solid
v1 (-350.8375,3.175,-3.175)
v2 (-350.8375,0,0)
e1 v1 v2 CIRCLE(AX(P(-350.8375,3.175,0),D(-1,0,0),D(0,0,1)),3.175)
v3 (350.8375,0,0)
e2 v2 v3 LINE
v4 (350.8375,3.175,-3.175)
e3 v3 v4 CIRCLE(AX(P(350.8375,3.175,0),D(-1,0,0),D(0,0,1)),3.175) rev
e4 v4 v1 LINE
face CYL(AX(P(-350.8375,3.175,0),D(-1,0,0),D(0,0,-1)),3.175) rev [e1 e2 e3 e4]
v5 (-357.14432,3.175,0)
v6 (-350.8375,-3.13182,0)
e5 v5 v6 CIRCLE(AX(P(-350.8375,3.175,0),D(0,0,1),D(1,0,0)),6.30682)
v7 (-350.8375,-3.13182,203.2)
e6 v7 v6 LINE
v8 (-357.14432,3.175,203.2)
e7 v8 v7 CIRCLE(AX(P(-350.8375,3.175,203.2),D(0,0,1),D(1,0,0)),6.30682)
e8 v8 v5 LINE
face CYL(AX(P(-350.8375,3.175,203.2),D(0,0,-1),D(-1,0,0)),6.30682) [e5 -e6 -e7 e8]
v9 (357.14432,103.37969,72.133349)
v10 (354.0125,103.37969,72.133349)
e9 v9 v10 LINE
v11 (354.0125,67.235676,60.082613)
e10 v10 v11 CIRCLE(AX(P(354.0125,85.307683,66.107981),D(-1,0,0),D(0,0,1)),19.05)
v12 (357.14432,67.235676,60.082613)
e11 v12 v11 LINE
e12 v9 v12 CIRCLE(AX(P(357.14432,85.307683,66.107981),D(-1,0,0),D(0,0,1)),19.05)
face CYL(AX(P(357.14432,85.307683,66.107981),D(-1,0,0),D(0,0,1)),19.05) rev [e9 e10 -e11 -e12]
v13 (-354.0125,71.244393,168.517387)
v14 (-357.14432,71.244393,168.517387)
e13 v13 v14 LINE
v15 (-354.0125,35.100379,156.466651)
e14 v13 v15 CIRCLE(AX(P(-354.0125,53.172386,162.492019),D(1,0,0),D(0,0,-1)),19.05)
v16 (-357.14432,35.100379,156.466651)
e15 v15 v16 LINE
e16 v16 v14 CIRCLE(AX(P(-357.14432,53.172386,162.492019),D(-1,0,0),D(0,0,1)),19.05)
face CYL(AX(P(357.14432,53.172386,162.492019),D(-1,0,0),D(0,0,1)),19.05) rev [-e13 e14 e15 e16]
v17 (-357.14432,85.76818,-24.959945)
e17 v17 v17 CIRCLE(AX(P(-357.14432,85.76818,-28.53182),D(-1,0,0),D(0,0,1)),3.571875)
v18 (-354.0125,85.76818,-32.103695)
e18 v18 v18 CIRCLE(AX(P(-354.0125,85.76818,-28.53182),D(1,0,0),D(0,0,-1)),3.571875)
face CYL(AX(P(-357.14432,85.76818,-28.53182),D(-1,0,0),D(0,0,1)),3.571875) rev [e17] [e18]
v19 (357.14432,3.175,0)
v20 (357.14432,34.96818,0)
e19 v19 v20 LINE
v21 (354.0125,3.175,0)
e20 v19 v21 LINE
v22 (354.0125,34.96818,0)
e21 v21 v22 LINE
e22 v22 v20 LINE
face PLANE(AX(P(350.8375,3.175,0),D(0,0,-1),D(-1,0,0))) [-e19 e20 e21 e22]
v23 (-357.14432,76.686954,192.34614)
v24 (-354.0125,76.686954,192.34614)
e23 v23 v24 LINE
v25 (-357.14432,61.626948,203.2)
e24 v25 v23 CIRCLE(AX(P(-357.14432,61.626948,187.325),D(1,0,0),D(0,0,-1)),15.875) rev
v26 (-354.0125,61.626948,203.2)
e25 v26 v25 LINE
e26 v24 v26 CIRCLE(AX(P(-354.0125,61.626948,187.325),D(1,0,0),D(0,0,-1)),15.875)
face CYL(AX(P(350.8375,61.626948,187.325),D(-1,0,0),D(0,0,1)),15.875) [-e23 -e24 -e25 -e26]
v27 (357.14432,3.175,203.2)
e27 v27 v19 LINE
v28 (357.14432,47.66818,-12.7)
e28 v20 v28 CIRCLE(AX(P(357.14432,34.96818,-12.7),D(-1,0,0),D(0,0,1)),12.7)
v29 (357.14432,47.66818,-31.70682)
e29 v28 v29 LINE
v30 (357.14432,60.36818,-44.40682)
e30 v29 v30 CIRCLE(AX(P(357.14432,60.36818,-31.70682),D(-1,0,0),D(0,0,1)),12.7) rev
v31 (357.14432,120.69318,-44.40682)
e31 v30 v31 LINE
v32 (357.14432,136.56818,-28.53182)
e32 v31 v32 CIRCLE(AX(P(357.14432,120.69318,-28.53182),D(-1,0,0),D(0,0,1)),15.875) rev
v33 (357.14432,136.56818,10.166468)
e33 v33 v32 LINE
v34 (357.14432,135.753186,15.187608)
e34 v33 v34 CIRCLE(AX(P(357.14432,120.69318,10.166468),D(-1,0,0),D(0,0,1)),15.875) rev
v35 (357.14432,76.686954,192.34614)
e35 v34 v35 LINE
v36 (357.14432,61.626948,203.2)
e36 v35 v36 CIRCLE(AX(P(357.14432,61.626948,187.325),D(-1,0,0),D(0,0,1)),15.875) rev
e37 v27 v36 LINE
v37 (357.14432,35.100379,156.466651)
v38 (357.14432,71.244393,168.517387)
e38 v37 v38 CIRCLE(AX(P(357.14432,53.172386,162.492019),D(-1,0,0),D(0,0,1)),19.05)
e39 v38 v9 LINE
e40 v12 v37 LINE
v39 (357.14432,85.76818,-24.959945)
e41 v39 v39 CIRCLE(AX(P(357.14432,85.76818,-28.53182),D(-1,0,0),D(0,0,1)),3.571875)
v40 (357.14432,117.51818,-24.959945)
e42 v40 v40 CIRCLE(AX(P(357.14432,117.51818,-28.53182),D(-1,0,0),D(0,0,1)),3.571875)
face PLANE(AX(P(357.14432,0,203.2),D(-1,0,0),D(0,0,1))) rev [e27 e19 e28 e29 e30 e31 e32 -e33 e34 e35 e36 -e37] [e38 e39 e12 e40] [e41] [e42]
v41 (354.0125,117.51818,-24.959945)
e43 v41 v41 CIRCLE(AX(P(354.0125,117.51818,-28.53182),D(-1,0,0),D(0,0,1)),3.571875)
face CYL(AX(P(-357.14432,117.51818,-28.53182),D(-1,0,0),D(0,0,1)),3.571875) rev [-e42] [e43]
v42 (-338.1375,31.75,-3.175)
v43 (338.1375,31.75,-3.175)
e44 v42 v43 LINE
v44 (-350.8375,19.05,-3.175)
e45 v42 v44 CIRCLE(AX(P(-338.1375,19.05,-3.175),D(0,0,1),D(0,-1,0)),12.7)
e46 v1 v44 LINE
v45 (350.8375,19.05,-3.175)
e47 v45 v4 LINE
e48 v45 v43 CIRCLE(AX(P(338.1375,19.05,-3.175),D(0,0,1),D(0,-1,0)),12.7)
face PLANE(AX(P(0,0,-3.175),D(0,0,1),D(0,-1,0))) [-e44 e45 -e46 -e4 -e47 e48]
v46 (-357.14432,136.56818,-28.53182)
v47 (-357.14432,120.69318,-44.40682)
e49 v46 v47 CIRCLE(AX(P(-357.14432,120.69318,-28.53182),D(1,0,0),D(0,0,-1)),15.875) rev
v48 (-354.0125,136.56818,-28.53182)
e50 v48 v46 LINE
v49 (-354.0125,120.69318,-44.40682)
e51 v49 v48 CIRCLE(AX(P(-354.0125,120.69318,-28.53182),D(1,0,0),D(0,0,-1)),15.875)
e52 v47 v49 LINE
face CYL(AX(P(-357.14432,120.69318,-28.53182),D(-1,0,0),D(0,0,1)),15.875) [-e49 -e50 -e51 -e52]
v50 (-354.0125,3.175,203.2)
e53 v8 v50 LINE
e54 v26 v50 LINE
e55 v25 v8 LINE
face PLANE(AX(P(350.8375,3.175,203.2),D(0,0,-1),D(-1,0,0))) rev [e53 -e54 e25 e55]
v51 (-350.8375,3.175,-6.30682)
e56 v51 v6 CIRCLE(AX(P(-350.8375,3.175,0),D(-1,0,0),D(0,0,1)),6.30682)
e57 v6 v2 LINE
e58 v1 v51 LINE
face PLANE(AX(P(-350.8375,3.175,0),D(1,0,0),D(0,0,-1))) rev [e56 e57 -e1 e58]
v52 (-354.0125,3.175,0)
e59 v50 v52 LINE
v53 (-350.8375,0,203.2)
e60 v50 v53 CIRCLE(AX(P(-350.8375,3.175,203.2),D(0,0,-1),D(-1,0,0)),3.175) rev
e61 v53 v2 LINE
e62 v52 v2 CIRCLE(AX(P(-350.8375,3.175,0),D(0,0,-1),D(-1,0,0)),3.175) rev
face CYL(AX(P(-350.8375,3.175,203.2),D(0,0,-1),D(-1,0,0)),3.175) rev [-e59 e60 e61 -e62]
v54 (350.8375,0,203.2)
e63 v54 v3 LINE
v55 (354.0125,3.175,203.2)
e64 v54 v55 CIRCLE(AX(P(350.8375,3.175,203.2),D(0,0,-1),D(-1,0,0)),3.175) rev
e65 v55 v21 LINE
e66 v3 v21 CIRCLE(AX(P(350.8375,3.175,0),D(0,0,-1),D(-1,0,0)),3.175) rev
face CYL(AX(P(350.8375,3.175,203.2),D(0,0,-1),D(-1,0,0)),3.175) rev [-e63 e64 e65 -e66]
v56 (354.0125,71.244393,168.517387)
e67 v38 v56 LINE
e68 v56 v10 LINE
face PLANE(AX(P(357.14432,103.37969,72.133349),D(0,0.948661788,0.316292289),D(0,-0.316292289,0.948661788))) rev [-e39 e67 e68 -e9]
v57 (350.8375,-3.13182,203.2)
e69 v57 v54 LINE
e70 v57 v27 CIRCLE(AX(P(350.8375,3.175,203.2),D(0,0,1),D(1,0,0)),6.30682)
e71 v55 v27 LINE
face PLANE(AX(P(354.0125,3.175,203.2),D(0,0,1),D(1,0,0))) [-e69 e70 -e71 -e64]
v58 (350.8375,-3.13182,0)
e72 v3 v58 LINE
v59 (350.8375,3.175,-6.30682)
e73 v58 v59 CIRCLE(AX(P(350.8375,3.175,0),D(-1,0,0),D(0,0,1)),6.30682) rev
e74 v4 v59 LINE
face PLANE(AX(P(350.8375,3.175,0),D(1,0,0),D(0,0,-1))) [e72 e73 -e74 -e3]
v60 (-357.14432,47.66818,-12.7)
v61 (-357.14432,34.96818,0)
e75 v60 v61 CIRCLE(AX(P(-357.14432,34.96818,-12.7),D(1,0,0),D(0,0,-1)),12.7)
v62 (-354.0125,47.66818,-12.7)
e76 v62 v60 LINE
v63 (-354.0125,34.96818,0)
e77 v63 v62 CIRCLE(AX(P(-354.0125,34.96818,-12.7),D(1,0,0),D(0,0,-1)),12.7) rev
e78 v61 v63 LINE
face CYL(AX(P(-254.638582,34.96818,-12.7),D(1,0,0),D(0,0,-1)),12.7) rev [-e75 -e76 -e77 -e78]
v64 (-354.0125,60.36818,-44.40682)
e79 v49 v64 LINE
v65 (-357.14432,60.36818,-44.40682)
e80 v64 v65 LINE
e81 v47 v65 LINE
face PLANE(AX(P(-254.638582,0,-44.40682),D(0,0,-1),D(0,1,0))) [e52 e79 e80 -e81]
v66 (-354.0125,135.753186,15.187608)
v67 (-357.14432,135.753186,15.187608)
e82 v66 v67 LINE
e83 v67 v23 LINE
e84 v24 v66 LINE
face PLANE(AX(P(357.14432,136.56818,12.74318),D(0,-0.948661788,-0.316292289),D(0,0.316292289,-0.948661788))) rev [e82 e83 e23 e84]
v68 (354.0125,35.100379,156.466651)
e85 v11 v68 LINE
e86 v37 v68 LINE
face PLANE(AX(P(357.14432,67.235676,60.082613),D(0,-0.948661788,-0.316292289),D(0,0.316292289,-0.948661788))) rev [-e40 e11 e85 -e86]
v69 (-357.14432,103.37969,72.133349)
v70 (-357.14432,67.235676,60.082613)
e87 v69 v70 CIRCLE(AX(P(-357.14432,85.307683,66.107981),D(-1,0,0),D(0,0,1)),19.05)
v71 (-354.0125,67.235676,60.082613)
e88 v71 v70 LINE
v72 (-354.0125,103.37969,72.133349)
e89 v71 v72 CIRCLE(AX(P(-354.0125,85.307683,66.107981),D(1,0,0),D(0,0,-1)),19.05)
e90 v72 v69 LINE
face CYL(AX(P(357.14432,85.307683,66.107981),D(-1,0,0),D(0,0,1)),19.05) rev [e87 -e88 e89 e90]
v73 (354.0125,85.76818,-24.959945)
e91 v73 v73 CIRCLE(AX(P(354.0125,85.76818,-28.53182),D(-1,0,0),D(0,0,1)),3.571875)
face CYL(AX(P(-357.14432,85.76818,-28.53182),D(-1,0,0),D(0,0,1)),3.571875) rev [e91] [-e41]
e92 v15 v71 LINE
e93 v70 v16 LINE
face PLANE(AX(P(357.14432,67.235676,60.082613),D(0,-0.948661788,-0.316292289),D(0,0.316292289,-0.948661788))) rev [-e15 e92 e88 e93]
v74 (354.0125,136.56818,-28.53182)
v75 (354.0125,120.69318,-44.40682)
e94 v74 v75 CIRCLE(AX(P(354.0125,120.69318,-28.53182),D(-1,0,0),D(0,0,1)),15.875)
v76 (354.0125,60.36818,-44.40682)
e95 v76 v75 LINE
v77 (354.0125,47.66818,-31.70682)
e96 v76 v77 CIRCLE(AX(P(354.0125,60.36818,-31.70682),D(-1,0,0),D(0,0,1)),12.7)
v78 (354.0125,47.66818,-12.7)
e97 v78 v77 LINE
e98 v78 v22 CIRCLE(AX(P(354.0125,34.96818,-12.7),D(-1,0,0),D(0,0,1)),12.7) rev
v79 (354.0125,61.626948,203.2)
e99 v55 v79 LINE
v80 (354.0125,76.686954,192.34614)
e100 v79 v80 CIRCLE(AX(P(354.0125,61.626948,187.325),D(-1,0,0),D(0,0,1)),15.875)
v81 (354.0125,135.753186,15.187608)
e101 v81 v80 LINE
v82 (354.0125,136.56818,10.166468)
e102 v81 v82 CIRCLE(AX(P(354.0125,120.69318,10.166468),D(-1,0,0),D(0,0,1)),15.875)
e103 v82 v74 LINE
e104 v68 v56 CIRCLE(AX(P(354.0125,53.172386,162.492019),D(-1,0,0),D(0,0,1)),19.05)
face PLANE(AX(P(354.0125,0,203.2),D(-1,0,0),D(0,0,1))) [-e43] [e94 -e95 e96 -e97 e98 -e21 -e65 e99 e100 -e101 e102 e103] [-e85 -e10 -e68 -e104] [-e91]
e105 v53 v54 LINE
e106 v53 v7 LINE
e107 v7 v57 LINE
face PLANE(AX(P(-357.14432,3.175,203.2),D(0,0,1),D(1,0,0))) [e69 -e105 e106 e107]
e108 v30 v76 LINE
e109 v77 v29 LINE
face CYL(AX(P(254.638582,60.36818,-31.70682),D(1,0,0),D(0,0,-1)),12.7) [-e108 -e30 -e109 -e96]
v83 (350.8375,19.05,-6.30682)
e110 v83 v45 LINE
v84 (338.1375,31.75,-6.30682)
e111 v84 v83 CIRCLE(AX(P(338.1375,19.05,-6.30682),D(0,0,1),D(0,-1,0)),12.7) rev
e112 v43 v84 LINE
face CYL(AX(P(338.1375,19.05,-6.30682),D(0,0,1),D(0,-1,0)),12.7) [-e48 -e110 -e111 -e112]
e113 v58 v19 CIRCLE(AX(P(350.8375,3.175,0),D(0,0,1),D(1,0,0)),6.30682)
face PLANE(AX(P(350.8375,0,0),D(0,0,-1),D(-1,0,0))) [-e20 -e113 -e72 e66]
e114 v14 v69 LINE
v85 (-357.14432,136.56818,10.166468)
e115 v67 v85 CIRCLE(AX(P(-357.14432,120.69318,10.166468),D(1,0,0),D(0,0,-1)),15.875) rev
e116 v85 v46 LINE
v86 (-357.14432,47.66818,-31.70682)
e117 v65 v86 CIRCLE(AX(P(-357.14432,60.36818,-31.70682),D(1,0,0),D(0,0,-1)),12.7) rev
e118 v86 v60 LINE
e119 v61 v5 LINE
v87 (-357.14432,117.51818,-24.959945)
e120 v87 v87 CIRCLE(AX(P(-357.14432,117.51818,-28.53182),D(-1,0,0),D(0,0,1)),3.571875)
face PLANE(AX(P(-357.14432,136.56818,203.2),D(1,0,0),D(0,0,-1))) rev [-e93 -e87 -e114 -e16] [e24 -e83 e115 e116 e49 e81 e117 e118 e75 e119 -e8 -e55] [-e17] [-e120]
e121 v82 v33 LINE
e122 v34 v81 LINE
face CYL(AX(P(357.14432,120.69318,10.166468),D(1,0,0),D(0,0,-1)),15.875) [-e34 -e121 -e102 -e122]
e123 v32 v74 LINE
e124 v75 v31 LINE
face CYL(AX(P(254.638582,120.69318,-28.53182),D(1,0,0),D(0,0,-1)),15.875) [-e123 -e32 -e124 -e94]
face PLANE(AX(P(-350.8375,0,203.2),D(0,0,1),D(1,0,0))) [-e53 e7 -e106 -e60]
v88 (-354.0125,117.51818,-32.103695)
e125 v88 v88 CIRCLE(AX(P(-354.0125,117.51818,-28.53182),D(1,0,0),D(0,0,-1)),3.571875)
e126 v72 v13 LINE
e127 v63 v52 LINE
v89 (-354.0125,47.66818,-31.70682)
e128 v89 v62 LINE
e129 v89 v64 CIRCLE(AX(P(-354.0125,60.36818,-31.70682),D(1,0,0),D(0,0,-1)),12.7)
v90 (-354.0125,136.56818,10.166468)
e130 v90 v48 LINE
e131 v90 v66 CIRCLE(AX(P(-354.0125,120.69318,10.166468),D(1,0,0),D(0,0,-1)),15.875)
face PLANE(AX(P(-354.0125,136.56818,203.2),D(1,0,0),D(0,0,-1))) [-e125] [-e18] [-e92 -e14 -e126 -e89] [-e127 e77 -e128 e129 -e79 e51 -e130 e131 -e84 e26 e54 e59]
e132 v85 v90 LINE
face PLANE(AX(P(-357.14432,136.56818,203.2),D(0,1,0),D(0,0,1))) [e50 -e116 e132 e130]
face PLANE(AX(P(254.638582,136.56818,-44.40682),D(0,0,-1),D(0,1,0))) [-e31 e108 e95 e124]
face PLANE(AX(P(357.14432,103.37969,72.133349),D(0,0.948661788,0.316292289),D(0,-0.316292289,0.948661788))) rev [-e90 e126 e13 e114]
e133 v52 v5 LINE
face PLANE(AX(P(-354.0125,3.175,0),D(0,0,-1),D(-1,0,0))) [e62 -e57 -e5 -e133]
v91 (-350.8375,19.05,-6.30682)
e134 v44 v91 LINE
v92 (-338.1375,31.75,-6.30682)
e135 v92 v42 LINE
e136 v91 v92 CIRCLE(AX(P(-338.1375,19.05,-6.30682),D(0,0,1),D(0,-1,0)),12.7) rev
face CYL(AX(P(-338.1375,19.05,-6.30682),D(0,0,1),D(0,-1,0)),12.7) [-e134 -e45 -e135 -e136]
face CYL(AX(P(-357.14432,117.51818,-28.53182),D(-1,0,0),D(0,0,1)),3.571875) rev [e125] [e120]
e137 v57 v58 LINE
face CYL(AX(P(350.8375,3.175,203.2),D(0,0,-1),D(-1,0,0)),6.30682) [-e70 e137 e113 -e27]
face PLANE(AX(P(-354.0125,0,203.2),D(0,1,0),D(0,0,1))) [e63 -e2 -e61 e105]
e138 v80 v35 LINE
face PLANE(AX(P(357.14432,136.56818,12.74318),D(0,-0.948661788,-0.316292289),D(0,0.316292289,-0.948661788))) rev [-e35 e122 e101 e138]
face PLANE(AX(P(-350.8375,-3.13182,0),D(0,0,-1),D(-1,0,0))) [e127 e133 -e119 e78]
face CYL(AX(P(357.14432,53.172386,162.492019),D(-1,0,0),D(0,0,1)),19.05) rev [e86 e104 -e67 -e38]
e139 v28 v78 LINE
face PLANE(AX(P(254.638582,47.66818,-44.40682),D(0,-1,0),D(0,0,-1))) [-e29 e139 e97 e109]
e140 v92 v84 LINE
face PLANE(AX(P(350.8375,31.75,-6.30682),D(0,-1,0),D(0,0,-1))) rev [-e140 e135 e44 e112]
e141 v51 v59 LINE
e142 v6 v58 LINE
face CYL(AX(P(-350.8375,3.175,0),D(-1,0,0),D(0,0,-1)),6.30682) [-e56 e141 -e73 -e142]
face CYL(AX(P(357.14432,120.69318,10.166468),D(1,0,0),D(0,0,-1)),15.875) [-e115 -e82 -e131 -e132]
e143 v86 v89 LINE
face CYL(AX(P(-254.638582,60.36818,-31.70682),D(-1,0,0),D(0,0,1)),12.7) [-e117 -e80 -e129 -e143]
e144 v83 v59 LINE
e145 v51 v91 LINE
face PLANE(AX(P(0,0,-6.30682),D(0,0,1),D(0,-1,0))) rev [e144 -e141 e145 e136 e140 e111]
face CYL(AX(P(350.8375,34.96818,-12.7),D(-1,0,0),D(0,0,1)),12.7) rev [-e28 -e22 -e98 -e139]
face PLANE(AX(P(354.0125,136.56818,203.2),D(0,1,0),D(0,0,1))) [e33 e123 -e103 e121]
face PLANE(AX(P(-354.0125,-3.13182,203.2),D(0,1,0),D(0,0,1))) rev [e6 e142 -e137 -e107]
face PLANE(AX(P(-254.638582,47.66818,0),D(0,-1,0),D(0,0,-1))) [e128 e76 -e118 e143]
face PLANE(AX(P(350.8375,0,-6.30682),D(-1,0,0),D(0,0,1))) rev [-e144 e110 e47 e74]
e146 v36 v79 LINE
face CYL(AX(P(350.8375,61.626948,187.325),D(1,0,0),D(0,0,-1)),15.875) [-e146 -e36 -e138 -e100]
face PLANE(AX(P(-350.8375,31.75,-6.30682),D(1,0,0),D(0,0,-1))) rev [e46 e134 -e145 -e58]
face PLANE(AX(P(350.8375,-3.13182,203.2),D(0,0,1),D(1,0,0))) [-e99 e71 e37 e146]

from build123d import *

# Parameters (mm, degrees)
BASE_FLANGE1_DEPTH              = 203.2
SKETCH6_W                       = 44.40682
SKETCH6_H                       = 88.9
BOSS_EXTRUDE1_DEPTH             = 3.13182
SKETCH7_W                       = 44.40682
SKETCH7_H                       = 88.9
BOSS_EXTRUDE2_DEPTH             = 3.13182
CUT_EXTRUDE1_DEPTH              = 756.082359098
F_9_32_0_28125_DIAMETER_HOLE1_D = 7.14375
EDGE_FLANGE1_DEPTH              = 701.675
FILLET1_R                       = 12.7
FILLET2_R                       = 15.875


# Sheet-metal steps are written as plain solids
with BuildPart() as part:
    # Sketch1 → Base-Flange1 (new body)
    with BuildSketch(Plane.XY):
        with BuildLine():
            Line((-354.0125, 136.56818), (-354.0125, 3.175))
            ThreePointArc((-354.0125, 3.175), (-353.08256403, 0.92993597), (-350.8375, 0))
            Line((-350.8375, 0), (350.8375, 0))
            ThreePointArc((350.8375, 0), (353.08256403, 0.92993597), (354.0125, 3.175))
            Line((354.0125, 3.175), (354.0125, 136.56818))
            Line((354.0125, 136.56818), (357.14432, 136.56818))
            Line((357.14432, 136.56818), (357.14432, 3.175))
            ThreePointArc((357.14432, 3.175), (355.29709519, -1.28459519), (350.8375, -3.13182))
            Line((350.8375, -3.13182), (-350.8375, -3.13182))
            ThreePointArc((-350.8375, -3.13182), (-355.29709519, -1.28459519), (-357.14432, 3.175))
            Line((-357.14432, 3.175), (-357.14432, 136.56818))
            Line((-357.14432, 136.56818), (-354.0125, 136.56818))
        make_face()
    extrude(amount=BASE_FLANGE1_DEPTH)

    # Sketch6 → Boss-Extrude1 (add)
    with BuildSketch(Plane(origin=(357.14432, 0, 0), x_dir=(0, 0, -1), z_dir=(1, 0, 0))):
        with Locations((22.20341, 92.11818)):
            Rectangle(SKETCH6_W, SKETCH6_H)
    extrude(amount=-BOSS_EXTRUDE1_DEPTH)

    # Sketch7 → Boss-Extrude2 (add)
    with BuildSketch(Plane.ZY.offset(357.14432)):
        with Locations((-22.20341, 92.11818)):
            Rectangle(SKETCH7_W, SKETCH7_H)
    extrude(amount=-BOSS_EXTRUDE2_DEPTH)

    # Sketch8 → Cut-Extrude1 (cut, through all)
    with BuildSketch(Plane.ZY.offset(357.14432)):
        with BuildLine():
            Line((72.133349274, 103.379689668), (168.517386933, 71.244393115))
            ThreePointArc((168.517386933, 71.244393115), (180.56402589, 47.14701795), (156.466650726, 35.100378992))
            Line((156.466650726, 35.100378992), (60.082613067, 67.235675546))
            ThreePointArc((60.082613067, 67.235675546), (48.03597411, 91.333050711), (72.133349274, 103.379689668))
        make_face()
        Polygon((12.74318, 136.56818), (203.2, 73.06818), (203.2, 136.56818), align=None)
    extrude(amount=-CUT_EXTRUDE1_DEPTH, mode=Mode.SUBTRACT)

    # 9/32 (0.28125) Diameter Hole1 (through all)
    with Locations(Plane.ZY.offset(357.14432)):
        with Locations((-28.53182, 85.76818), (-28.53182, 117.51818)):
            Hole(F_9_32_0_28125_DIAMETER_HOLE1_D / 2)

    # Edge-Flange1 section (across the edge) → Edge-Flange1 (add)
    with BuildSketch(Plane(origin=(350.8375, 0, -3.175), x_dir=(0, 0, 1), z_dir=(-1, 0, 0))):
        with BuildLine():
            Line((-3.13182, 3.175), (-3.13182, 31.75))
            Line((-3.13182, 31.75), (0, 31.75))
            Line((0, 31.75), (0, 3.175))
            ThreePointArc((0, 3.175), (0.92993597, 0.92993597), (3.175, 0))
            Line((3.175, 0), (3.175, -3.13182))
            ThreePointArc((3.175, -3.13182), (-1.28459519, -1.28459519), (-3.13182, 3.175))
        make_face()
    extrude(amount=EDGE_FLANGE1_DEPTH)

    # Fillet1
    fillet1_edges = [part.edges().sort_by_distance(p)[0] for p in [
        (350.8375, 31.75, -4.74091),
        (-350.8375, 31.75, -4.74091),
        (355.57841, 47.66818, -44.40682),
        (355.57841, 47.66818, 0),
        (-355.57841, 47.66818, 0),
        (-355.57841, 47.66818, -44.40682),
    ]]
    fillet(fillet1_edges, radius=FILLET1_R)

    # Fillet2
    fillet2_edges = [part.edges().sort_by_distance(p)[0] for p in [
        (355.57841, 136.56818, -44.40682),
        (-355.57841, 136.56818, -44.40682),
        (-355.57841, 73.06818, 203.2),
        (355.57841, 73.06818, 203.2),
        (355.57841, 136.56818, 12.74318),
        (-355.57841, 136.56818, 12.74318),
    ]]
    fillet(fillet2_edges, radius=FILLET2_R)


solid = part.part
